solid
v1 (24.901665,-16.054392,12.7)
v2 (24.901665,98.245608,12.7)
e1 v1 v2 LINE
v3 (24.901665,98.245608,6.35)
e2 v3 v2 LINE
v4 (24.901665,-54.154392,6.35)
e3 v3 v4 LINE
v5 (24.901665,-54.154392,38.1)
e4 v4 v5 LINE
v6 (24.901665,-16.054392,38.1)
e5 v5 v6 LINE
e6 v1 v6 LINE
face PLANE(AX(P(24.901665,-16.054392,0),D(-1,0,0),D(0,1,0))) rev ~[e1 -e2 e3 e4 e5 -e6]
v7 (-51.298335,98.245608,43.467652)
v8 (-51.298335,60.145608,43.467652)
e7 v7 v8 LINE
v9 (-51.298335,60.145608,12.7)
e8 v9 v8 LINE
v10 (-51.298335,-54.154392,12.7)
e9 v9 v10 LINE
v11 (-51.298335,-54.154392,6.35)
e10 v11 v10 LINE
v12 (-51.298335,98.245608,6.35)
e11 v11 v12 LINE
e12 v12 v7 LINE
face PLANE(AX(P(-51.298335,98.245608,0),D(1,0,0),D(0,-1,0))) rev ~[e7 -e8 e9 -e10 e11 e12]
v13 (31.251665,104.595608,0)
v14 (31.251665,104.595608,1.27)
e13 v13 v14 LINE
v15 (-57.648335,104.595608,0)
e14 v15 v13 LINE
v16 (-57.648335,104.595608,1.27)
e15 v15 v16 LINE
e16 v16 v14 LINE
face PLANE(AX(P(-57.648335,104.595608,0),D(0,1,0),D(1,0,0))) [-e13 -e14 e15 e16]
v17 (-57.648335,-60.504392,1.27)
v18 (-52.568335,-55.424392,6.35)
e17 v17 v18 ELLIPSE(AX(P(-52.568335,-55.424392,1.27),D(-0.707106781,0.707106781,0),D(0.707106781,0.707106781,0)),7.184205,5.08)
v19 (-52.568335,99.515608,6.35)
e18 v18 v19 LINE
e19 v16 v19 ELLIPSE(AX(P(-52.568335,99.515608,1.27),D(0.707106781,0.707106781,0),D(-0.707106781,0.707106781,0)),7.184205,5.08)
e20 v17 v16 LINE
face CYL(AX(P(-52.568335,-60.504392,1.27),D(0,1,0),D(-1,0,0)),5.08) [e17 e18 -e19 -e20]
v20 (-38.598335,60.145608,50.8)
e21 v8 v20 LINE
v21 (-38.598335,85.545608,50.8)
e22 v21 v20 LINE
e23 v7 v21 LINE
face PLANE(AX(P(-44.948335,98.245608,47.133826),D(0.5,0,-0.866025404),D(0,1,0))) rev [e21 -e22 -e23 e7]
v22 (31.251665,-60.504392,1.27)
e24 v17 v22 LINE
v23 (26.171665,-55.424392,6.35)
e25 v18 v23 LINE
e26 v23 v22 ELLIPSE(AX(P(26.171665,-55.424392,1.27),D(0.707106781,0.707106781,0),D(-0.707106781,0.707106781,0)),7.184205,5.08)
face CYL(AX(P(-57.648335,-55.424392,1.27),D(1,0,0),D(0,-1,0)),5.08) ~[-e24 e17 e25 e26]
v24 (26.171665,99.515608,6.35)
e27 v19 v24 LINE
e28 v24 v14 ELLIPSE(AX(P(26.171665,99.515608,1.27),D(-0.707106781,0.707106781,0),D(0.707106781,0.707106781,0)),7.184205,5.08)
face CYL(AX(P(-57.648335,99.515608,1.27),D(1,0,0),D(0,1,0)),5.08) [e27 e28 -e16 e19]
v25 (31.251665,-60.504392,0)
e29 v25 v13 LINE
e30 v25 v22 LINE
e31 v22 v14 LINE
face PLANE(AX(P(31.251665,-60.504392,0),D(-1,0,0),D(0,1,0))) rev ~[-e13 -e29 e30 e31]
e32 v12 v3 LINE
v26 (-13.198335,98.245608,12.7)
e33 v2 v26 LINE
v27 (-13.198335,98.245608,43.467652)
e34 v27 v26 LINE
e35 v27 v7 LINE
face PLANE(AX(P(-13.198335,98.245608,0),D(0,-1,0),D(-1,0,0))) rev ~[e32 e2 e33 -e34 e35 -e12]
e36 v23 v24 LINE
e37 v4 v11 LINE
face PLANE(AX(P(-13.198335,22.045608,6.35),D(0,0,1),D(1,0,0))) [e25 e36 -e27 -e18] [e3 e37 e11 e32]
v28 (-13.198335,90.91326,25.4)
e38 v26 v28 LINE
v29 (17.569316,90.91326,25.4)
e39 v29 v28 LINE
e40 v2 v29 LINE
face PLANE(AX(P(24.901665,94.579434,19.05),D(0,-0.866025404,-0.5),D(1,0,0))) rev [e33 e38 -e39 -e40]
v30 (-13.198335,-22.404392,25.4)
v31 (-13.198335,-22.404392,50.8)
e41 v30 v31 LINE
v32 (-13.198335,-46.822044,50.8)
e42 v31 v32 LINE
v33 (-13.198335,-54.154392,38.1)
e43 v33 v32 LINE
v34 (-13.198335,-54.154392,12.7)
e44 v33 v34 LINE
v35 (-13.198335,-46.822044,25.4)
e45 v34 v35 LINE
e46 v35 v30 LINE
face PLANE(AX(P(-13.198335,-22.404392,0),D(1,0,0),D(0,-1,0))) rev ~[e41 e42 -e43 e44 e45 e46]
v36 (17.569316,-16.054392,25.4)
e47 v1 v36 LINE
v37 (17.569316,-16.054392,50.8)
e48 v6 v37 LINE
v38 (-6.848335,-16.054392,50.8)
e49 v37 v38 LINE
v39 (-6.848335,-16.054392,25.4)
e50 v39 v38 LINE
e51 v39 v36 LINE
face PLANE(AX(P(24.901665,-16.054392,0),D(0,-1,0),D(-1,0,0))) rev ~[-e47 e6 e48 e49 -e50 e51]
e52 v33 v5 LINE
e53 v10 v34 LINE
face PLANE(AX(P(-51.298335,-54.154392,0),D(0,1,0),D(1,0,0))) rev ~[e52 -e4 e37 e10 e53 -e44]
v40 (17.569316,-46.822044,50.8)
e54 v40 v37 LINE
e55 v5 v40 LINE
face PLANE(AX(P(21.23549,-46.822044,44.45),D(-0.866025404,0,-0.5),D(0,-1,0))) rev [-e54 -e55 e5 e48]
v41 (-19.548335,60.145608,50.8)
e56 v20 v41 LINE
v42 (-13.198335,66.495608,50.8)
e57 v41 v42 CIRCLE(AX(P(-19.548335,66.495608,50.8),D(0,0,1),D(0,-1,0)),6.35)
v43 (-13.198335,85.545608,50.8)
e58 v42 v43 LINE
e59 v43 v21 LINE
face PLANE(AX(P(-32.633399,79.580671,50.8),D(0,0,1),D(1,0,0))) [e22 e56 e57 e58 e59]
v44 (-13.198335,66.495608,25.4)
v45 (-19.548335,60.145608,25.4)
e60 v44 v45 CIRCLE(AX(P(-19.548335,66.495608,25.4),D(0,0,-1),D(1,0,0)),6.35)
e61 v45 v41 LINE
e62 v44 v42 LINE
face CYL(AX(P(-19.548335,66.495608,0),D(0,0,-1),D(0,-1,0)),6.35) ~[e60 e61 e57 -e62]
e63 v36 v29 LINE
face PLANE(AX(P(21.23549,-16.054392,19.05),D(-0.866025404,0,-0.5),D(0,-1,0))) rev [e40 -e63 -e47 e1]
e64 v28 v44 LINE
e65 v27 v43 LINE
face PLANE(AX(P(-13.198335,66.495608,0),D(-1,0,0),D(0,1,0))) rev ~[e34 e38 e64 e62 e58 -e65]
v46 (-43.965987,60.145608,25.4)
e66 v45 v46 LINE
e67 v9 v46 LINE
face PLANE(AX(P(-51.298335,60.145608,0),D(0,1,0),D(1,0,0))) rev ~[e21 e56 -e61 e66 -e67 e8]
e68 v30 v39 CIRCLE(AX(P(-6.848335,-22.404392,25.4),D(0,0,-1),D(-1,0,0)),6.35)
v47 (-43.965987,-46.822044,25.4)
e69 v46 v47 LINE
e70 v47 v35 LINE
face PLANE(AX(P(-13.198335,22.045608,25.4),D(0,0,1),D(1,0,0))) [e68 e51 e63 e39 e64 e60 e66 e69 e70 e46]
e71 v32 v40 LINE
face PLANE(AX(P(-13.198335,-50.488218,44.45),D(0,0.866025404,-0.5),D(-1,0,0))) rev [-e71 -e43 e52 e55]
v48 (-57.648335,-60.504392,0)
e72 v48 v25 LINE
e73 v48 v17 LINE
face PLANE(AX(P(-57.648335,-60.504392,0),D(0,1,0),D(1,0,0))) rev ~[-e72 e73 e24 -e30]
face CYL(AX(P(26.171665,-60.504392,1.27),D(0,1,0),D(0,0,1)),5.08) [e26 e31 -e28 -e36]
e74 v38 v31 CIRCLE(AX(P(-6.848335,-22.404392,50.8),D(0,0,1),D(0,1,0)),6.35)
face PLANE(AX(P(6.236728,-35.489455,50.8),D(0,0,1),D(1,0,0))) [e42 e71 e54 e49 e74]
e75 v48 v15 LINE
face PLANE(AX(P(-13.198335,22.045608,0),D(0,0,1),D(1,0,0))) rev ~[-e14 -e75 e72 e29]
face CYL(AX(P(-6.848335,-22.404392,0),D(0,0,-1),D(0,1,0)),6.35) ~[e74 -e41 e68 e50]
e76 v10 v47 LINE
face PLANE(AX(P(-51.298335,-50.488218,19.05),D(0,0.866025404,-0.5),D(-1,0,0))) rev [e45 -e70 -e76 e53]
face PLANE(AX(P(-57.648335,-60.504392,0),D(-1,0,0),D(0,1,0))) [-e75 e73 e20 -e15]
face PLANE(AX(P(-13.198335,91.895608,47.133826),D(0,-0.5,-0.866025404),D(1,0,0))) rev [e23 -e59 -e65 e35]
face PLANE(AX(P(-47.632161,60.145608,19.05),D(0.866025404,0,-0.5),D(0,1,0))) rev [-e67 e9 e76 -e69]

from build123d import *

# Parameters (mm, degrees)
F1_DEPTH    = 25.4
F2_DEPTH    = 50.8
F0_W        = 88.9
F0_H        = 165.1
F3_DEPTH    = 6.35
F4_R        = 5.08
F5_SIZE2    = 7.3323484187
F5_SIZE     = 12.7
F6_C1_SIZE2 = 12.7
F6_C1_SIZE  = 7.3323484187
F6_C2_SIZE2 = 7.3323484187
F6_C2_SIZE  = 12.7
F6_C3_SIZE2 = 12.7
F6_C3_SIZE  = 7.3323484187
F6_C4_SIZE2 = 7.3323484187
F6_C4_SIZE  = 12.7


with BuildPart() as f1:
    # F0 (on Top) → F1 (new body)
    with BuildSketch(Plane.XY):
        with BuildLine():
            Line((-19.5483354544, 60.1456080113), (-51.2983354544, 60.1456080113))
            Line((-51.2983354544, 60.1456080113), (-51.2983354544, -54.1543919887))
            Line((-51.2983354544, -54.1543919887), (-13.1983354544, -54.1543919887))
            Line((-13.1983354544, -54.1543919887), (-13.1983354544, -22.4043919887))
            ThreePointArc((-13.1983354544, -22.4043919887), (-11.3384635149, -17.9142639282), (-6.8483354544, -16.0543919887))
            Line((-6.8483354544, -16.0543919887), (24.9016645456, -16.0543919887))
            Line((24.9016645456, -16.0543919887), (24.9016645456, 98.2456080113))
            Line((24.9016645456, 98.2456080113), (-13.1983354544, 98.2456080113))
            Line((-13.1983354544, 98.2456080113), (-13.1983354544, 66.4956080113))
            ThreePointArc((-13.1983354544, 66.4956080113), (-15.0582073938, 62.0054799508), (-19.5483354544, 60.1456080113))
        make_face()
    extrude(amount=F1_DEPTH)

    # F0 (on Top) → F2 (join)
    with BuildSketch(Plane.XY):
        with BuildLine():
            Line((-13.1983354544, 98.2456080113), (-51.2983354544, 98.2456080113))
            Line((-51.2983354544, 98.2456080113), (-51.2983354544, 60.1456080113))
            Line((-51.2983354544, 60.1456080113), (-19.5483354544, 60.1456080113))
            ThreePointArc((-19.5483354544, 60.1456080113), (-15.0582073938, 62.0054799508), (-13.1983354544, 66.4956080113))
            Line((-13.1983354544, 66.4956080113), (-13.1983354544, 98.2456080113))
        make_face()
        with BuildLine():
            Line((-13.1983354544, -22.4043919887), (-13.1983354544, -54.1543919887))
            Line((-13.1983354544, -54.1543919887), (24.9016645456, -54.1543919887))
            Line((24.9016645456, -54.1543919887), (24.9016645456, -16.0543919887))
            Line((24.9016645456, -16.0543919887), (-6.8483354544, -16.0543919887))
            ThreePointArc((-6.8483354544, -16.0543919887), (-11.3384635149, -17.9142639282), (-13.1983354544, -22.4043919887))
        make_face()
    extrude(amount=F2_DEPTH)

    # F0 (on Top) → F3 (join)
    with BuildSketch(Plane.XY):
        with Locations((-13.1983354544, 22.0456080113)):
            Rectangle(F0_W, F0_H)
        Polygon((-51.2983354544, 60.1456080113), (-51.2983354544, 98.2456080113), (-13.1983354544, 98.2456080113), (24.9016645456, 98.2456080113), (24.9016645456, -16.0543919887), (24.9016645456, -54.1543919887), (-13.1983354544, -54.1543919887), (-51.2983354544, -54.1543919887), align=None, mode=Mode.SUBTRACT)
    extrude(amount=F3_DEPTH)

    # F4
    f4_edges = [f1.edges().sort_by_distance(p)[0] for p in [
        (31.251665, 22.045608, 6.35),
        (-13.198335, -60.504392, 6.35),
        (-57.648335, 22.045608, 6.35),
        (-13.198335, 104.595608, 6.35),
    ]]
    fillet(f4_edges, radius=F4_R)

    # F5
    f5_edges = [f1.edges().sort_by_distance(p)[0] for p in [
        (24.901665, 41.095608, 25.4),
        (5.851665, 98.245608, 25.4),
        (-51.298335, 2.995608, 25.4),
        (-32.248335, -54.154392, 25.4),
    ]]
    chamfer(f5_edges, length=F5_SIZE, length2=F5_SIZE2)

    # F6: chamfer of 12.7 x 7.3323484187 on 4 edges, made by hand

    # F6_c1
    f6_c1_edges = [f1.edges().sort_by_distance(p)[0] for p in [
        (-51.2983354544, 79.1956080113, 50.8),
    ]]
    f6_c1_side = f1.faces().sort_by_distance((-51.2983354544, 79.1956080113, 50.6533530316))[0]
    chamfer(f6_c1_edges, length=F6_C1_SIZE, length2=F6_C1_SIZE2, reference=f6_c1_side)

    # F6_c2
    f6_c2_edges = [f1.edges().sort_by_distance(p)[0] for p in [
        (5.8516645456, -54.1543919887, 50.8),
    ]]
    f6_c2_side = f1.faces().sort_by_distance((5.8516645456, -54.1543919887, 50.6533530316))[0]
    chamfer(f6_c2_edges, length=F6_C2_SIZE, length2=F6_C2_SIZE2, reference=f6_c2_side)

    # F6_c3
    f6_c3_edges = [f1.edges().sort_by_distance(p)[0] for p in [
        (-25.8983354544, 98.2456080113, 50.8),
    ]]
    f6_c3_side = f1.faces().sort_by_distance((-25.8983354544, 98.2456080113, 50.6533530316))[0]
    chamfer(f6_c3_edges, length=F6_C3_SIZE, length2=F6_C3_SIZE2, reference=f6_c3_side)

    # F6_c4
    f6_c4_edges = [f1.edges().sort_by_distance(p)[0] for p in [
        (24.9016645456, -31.4382177794, 50.8),
    ]]
    f6_c4_side = f1.faces().sort_by_distance((24.9016645456, -31.4382177794, 50.6533530316))[0]
    chamfer(f6_c4_edges, length=F6_C4_SIZE, length2=F6_C4_SIZE2, reference=f6_c4_side)


solid = f1.part
